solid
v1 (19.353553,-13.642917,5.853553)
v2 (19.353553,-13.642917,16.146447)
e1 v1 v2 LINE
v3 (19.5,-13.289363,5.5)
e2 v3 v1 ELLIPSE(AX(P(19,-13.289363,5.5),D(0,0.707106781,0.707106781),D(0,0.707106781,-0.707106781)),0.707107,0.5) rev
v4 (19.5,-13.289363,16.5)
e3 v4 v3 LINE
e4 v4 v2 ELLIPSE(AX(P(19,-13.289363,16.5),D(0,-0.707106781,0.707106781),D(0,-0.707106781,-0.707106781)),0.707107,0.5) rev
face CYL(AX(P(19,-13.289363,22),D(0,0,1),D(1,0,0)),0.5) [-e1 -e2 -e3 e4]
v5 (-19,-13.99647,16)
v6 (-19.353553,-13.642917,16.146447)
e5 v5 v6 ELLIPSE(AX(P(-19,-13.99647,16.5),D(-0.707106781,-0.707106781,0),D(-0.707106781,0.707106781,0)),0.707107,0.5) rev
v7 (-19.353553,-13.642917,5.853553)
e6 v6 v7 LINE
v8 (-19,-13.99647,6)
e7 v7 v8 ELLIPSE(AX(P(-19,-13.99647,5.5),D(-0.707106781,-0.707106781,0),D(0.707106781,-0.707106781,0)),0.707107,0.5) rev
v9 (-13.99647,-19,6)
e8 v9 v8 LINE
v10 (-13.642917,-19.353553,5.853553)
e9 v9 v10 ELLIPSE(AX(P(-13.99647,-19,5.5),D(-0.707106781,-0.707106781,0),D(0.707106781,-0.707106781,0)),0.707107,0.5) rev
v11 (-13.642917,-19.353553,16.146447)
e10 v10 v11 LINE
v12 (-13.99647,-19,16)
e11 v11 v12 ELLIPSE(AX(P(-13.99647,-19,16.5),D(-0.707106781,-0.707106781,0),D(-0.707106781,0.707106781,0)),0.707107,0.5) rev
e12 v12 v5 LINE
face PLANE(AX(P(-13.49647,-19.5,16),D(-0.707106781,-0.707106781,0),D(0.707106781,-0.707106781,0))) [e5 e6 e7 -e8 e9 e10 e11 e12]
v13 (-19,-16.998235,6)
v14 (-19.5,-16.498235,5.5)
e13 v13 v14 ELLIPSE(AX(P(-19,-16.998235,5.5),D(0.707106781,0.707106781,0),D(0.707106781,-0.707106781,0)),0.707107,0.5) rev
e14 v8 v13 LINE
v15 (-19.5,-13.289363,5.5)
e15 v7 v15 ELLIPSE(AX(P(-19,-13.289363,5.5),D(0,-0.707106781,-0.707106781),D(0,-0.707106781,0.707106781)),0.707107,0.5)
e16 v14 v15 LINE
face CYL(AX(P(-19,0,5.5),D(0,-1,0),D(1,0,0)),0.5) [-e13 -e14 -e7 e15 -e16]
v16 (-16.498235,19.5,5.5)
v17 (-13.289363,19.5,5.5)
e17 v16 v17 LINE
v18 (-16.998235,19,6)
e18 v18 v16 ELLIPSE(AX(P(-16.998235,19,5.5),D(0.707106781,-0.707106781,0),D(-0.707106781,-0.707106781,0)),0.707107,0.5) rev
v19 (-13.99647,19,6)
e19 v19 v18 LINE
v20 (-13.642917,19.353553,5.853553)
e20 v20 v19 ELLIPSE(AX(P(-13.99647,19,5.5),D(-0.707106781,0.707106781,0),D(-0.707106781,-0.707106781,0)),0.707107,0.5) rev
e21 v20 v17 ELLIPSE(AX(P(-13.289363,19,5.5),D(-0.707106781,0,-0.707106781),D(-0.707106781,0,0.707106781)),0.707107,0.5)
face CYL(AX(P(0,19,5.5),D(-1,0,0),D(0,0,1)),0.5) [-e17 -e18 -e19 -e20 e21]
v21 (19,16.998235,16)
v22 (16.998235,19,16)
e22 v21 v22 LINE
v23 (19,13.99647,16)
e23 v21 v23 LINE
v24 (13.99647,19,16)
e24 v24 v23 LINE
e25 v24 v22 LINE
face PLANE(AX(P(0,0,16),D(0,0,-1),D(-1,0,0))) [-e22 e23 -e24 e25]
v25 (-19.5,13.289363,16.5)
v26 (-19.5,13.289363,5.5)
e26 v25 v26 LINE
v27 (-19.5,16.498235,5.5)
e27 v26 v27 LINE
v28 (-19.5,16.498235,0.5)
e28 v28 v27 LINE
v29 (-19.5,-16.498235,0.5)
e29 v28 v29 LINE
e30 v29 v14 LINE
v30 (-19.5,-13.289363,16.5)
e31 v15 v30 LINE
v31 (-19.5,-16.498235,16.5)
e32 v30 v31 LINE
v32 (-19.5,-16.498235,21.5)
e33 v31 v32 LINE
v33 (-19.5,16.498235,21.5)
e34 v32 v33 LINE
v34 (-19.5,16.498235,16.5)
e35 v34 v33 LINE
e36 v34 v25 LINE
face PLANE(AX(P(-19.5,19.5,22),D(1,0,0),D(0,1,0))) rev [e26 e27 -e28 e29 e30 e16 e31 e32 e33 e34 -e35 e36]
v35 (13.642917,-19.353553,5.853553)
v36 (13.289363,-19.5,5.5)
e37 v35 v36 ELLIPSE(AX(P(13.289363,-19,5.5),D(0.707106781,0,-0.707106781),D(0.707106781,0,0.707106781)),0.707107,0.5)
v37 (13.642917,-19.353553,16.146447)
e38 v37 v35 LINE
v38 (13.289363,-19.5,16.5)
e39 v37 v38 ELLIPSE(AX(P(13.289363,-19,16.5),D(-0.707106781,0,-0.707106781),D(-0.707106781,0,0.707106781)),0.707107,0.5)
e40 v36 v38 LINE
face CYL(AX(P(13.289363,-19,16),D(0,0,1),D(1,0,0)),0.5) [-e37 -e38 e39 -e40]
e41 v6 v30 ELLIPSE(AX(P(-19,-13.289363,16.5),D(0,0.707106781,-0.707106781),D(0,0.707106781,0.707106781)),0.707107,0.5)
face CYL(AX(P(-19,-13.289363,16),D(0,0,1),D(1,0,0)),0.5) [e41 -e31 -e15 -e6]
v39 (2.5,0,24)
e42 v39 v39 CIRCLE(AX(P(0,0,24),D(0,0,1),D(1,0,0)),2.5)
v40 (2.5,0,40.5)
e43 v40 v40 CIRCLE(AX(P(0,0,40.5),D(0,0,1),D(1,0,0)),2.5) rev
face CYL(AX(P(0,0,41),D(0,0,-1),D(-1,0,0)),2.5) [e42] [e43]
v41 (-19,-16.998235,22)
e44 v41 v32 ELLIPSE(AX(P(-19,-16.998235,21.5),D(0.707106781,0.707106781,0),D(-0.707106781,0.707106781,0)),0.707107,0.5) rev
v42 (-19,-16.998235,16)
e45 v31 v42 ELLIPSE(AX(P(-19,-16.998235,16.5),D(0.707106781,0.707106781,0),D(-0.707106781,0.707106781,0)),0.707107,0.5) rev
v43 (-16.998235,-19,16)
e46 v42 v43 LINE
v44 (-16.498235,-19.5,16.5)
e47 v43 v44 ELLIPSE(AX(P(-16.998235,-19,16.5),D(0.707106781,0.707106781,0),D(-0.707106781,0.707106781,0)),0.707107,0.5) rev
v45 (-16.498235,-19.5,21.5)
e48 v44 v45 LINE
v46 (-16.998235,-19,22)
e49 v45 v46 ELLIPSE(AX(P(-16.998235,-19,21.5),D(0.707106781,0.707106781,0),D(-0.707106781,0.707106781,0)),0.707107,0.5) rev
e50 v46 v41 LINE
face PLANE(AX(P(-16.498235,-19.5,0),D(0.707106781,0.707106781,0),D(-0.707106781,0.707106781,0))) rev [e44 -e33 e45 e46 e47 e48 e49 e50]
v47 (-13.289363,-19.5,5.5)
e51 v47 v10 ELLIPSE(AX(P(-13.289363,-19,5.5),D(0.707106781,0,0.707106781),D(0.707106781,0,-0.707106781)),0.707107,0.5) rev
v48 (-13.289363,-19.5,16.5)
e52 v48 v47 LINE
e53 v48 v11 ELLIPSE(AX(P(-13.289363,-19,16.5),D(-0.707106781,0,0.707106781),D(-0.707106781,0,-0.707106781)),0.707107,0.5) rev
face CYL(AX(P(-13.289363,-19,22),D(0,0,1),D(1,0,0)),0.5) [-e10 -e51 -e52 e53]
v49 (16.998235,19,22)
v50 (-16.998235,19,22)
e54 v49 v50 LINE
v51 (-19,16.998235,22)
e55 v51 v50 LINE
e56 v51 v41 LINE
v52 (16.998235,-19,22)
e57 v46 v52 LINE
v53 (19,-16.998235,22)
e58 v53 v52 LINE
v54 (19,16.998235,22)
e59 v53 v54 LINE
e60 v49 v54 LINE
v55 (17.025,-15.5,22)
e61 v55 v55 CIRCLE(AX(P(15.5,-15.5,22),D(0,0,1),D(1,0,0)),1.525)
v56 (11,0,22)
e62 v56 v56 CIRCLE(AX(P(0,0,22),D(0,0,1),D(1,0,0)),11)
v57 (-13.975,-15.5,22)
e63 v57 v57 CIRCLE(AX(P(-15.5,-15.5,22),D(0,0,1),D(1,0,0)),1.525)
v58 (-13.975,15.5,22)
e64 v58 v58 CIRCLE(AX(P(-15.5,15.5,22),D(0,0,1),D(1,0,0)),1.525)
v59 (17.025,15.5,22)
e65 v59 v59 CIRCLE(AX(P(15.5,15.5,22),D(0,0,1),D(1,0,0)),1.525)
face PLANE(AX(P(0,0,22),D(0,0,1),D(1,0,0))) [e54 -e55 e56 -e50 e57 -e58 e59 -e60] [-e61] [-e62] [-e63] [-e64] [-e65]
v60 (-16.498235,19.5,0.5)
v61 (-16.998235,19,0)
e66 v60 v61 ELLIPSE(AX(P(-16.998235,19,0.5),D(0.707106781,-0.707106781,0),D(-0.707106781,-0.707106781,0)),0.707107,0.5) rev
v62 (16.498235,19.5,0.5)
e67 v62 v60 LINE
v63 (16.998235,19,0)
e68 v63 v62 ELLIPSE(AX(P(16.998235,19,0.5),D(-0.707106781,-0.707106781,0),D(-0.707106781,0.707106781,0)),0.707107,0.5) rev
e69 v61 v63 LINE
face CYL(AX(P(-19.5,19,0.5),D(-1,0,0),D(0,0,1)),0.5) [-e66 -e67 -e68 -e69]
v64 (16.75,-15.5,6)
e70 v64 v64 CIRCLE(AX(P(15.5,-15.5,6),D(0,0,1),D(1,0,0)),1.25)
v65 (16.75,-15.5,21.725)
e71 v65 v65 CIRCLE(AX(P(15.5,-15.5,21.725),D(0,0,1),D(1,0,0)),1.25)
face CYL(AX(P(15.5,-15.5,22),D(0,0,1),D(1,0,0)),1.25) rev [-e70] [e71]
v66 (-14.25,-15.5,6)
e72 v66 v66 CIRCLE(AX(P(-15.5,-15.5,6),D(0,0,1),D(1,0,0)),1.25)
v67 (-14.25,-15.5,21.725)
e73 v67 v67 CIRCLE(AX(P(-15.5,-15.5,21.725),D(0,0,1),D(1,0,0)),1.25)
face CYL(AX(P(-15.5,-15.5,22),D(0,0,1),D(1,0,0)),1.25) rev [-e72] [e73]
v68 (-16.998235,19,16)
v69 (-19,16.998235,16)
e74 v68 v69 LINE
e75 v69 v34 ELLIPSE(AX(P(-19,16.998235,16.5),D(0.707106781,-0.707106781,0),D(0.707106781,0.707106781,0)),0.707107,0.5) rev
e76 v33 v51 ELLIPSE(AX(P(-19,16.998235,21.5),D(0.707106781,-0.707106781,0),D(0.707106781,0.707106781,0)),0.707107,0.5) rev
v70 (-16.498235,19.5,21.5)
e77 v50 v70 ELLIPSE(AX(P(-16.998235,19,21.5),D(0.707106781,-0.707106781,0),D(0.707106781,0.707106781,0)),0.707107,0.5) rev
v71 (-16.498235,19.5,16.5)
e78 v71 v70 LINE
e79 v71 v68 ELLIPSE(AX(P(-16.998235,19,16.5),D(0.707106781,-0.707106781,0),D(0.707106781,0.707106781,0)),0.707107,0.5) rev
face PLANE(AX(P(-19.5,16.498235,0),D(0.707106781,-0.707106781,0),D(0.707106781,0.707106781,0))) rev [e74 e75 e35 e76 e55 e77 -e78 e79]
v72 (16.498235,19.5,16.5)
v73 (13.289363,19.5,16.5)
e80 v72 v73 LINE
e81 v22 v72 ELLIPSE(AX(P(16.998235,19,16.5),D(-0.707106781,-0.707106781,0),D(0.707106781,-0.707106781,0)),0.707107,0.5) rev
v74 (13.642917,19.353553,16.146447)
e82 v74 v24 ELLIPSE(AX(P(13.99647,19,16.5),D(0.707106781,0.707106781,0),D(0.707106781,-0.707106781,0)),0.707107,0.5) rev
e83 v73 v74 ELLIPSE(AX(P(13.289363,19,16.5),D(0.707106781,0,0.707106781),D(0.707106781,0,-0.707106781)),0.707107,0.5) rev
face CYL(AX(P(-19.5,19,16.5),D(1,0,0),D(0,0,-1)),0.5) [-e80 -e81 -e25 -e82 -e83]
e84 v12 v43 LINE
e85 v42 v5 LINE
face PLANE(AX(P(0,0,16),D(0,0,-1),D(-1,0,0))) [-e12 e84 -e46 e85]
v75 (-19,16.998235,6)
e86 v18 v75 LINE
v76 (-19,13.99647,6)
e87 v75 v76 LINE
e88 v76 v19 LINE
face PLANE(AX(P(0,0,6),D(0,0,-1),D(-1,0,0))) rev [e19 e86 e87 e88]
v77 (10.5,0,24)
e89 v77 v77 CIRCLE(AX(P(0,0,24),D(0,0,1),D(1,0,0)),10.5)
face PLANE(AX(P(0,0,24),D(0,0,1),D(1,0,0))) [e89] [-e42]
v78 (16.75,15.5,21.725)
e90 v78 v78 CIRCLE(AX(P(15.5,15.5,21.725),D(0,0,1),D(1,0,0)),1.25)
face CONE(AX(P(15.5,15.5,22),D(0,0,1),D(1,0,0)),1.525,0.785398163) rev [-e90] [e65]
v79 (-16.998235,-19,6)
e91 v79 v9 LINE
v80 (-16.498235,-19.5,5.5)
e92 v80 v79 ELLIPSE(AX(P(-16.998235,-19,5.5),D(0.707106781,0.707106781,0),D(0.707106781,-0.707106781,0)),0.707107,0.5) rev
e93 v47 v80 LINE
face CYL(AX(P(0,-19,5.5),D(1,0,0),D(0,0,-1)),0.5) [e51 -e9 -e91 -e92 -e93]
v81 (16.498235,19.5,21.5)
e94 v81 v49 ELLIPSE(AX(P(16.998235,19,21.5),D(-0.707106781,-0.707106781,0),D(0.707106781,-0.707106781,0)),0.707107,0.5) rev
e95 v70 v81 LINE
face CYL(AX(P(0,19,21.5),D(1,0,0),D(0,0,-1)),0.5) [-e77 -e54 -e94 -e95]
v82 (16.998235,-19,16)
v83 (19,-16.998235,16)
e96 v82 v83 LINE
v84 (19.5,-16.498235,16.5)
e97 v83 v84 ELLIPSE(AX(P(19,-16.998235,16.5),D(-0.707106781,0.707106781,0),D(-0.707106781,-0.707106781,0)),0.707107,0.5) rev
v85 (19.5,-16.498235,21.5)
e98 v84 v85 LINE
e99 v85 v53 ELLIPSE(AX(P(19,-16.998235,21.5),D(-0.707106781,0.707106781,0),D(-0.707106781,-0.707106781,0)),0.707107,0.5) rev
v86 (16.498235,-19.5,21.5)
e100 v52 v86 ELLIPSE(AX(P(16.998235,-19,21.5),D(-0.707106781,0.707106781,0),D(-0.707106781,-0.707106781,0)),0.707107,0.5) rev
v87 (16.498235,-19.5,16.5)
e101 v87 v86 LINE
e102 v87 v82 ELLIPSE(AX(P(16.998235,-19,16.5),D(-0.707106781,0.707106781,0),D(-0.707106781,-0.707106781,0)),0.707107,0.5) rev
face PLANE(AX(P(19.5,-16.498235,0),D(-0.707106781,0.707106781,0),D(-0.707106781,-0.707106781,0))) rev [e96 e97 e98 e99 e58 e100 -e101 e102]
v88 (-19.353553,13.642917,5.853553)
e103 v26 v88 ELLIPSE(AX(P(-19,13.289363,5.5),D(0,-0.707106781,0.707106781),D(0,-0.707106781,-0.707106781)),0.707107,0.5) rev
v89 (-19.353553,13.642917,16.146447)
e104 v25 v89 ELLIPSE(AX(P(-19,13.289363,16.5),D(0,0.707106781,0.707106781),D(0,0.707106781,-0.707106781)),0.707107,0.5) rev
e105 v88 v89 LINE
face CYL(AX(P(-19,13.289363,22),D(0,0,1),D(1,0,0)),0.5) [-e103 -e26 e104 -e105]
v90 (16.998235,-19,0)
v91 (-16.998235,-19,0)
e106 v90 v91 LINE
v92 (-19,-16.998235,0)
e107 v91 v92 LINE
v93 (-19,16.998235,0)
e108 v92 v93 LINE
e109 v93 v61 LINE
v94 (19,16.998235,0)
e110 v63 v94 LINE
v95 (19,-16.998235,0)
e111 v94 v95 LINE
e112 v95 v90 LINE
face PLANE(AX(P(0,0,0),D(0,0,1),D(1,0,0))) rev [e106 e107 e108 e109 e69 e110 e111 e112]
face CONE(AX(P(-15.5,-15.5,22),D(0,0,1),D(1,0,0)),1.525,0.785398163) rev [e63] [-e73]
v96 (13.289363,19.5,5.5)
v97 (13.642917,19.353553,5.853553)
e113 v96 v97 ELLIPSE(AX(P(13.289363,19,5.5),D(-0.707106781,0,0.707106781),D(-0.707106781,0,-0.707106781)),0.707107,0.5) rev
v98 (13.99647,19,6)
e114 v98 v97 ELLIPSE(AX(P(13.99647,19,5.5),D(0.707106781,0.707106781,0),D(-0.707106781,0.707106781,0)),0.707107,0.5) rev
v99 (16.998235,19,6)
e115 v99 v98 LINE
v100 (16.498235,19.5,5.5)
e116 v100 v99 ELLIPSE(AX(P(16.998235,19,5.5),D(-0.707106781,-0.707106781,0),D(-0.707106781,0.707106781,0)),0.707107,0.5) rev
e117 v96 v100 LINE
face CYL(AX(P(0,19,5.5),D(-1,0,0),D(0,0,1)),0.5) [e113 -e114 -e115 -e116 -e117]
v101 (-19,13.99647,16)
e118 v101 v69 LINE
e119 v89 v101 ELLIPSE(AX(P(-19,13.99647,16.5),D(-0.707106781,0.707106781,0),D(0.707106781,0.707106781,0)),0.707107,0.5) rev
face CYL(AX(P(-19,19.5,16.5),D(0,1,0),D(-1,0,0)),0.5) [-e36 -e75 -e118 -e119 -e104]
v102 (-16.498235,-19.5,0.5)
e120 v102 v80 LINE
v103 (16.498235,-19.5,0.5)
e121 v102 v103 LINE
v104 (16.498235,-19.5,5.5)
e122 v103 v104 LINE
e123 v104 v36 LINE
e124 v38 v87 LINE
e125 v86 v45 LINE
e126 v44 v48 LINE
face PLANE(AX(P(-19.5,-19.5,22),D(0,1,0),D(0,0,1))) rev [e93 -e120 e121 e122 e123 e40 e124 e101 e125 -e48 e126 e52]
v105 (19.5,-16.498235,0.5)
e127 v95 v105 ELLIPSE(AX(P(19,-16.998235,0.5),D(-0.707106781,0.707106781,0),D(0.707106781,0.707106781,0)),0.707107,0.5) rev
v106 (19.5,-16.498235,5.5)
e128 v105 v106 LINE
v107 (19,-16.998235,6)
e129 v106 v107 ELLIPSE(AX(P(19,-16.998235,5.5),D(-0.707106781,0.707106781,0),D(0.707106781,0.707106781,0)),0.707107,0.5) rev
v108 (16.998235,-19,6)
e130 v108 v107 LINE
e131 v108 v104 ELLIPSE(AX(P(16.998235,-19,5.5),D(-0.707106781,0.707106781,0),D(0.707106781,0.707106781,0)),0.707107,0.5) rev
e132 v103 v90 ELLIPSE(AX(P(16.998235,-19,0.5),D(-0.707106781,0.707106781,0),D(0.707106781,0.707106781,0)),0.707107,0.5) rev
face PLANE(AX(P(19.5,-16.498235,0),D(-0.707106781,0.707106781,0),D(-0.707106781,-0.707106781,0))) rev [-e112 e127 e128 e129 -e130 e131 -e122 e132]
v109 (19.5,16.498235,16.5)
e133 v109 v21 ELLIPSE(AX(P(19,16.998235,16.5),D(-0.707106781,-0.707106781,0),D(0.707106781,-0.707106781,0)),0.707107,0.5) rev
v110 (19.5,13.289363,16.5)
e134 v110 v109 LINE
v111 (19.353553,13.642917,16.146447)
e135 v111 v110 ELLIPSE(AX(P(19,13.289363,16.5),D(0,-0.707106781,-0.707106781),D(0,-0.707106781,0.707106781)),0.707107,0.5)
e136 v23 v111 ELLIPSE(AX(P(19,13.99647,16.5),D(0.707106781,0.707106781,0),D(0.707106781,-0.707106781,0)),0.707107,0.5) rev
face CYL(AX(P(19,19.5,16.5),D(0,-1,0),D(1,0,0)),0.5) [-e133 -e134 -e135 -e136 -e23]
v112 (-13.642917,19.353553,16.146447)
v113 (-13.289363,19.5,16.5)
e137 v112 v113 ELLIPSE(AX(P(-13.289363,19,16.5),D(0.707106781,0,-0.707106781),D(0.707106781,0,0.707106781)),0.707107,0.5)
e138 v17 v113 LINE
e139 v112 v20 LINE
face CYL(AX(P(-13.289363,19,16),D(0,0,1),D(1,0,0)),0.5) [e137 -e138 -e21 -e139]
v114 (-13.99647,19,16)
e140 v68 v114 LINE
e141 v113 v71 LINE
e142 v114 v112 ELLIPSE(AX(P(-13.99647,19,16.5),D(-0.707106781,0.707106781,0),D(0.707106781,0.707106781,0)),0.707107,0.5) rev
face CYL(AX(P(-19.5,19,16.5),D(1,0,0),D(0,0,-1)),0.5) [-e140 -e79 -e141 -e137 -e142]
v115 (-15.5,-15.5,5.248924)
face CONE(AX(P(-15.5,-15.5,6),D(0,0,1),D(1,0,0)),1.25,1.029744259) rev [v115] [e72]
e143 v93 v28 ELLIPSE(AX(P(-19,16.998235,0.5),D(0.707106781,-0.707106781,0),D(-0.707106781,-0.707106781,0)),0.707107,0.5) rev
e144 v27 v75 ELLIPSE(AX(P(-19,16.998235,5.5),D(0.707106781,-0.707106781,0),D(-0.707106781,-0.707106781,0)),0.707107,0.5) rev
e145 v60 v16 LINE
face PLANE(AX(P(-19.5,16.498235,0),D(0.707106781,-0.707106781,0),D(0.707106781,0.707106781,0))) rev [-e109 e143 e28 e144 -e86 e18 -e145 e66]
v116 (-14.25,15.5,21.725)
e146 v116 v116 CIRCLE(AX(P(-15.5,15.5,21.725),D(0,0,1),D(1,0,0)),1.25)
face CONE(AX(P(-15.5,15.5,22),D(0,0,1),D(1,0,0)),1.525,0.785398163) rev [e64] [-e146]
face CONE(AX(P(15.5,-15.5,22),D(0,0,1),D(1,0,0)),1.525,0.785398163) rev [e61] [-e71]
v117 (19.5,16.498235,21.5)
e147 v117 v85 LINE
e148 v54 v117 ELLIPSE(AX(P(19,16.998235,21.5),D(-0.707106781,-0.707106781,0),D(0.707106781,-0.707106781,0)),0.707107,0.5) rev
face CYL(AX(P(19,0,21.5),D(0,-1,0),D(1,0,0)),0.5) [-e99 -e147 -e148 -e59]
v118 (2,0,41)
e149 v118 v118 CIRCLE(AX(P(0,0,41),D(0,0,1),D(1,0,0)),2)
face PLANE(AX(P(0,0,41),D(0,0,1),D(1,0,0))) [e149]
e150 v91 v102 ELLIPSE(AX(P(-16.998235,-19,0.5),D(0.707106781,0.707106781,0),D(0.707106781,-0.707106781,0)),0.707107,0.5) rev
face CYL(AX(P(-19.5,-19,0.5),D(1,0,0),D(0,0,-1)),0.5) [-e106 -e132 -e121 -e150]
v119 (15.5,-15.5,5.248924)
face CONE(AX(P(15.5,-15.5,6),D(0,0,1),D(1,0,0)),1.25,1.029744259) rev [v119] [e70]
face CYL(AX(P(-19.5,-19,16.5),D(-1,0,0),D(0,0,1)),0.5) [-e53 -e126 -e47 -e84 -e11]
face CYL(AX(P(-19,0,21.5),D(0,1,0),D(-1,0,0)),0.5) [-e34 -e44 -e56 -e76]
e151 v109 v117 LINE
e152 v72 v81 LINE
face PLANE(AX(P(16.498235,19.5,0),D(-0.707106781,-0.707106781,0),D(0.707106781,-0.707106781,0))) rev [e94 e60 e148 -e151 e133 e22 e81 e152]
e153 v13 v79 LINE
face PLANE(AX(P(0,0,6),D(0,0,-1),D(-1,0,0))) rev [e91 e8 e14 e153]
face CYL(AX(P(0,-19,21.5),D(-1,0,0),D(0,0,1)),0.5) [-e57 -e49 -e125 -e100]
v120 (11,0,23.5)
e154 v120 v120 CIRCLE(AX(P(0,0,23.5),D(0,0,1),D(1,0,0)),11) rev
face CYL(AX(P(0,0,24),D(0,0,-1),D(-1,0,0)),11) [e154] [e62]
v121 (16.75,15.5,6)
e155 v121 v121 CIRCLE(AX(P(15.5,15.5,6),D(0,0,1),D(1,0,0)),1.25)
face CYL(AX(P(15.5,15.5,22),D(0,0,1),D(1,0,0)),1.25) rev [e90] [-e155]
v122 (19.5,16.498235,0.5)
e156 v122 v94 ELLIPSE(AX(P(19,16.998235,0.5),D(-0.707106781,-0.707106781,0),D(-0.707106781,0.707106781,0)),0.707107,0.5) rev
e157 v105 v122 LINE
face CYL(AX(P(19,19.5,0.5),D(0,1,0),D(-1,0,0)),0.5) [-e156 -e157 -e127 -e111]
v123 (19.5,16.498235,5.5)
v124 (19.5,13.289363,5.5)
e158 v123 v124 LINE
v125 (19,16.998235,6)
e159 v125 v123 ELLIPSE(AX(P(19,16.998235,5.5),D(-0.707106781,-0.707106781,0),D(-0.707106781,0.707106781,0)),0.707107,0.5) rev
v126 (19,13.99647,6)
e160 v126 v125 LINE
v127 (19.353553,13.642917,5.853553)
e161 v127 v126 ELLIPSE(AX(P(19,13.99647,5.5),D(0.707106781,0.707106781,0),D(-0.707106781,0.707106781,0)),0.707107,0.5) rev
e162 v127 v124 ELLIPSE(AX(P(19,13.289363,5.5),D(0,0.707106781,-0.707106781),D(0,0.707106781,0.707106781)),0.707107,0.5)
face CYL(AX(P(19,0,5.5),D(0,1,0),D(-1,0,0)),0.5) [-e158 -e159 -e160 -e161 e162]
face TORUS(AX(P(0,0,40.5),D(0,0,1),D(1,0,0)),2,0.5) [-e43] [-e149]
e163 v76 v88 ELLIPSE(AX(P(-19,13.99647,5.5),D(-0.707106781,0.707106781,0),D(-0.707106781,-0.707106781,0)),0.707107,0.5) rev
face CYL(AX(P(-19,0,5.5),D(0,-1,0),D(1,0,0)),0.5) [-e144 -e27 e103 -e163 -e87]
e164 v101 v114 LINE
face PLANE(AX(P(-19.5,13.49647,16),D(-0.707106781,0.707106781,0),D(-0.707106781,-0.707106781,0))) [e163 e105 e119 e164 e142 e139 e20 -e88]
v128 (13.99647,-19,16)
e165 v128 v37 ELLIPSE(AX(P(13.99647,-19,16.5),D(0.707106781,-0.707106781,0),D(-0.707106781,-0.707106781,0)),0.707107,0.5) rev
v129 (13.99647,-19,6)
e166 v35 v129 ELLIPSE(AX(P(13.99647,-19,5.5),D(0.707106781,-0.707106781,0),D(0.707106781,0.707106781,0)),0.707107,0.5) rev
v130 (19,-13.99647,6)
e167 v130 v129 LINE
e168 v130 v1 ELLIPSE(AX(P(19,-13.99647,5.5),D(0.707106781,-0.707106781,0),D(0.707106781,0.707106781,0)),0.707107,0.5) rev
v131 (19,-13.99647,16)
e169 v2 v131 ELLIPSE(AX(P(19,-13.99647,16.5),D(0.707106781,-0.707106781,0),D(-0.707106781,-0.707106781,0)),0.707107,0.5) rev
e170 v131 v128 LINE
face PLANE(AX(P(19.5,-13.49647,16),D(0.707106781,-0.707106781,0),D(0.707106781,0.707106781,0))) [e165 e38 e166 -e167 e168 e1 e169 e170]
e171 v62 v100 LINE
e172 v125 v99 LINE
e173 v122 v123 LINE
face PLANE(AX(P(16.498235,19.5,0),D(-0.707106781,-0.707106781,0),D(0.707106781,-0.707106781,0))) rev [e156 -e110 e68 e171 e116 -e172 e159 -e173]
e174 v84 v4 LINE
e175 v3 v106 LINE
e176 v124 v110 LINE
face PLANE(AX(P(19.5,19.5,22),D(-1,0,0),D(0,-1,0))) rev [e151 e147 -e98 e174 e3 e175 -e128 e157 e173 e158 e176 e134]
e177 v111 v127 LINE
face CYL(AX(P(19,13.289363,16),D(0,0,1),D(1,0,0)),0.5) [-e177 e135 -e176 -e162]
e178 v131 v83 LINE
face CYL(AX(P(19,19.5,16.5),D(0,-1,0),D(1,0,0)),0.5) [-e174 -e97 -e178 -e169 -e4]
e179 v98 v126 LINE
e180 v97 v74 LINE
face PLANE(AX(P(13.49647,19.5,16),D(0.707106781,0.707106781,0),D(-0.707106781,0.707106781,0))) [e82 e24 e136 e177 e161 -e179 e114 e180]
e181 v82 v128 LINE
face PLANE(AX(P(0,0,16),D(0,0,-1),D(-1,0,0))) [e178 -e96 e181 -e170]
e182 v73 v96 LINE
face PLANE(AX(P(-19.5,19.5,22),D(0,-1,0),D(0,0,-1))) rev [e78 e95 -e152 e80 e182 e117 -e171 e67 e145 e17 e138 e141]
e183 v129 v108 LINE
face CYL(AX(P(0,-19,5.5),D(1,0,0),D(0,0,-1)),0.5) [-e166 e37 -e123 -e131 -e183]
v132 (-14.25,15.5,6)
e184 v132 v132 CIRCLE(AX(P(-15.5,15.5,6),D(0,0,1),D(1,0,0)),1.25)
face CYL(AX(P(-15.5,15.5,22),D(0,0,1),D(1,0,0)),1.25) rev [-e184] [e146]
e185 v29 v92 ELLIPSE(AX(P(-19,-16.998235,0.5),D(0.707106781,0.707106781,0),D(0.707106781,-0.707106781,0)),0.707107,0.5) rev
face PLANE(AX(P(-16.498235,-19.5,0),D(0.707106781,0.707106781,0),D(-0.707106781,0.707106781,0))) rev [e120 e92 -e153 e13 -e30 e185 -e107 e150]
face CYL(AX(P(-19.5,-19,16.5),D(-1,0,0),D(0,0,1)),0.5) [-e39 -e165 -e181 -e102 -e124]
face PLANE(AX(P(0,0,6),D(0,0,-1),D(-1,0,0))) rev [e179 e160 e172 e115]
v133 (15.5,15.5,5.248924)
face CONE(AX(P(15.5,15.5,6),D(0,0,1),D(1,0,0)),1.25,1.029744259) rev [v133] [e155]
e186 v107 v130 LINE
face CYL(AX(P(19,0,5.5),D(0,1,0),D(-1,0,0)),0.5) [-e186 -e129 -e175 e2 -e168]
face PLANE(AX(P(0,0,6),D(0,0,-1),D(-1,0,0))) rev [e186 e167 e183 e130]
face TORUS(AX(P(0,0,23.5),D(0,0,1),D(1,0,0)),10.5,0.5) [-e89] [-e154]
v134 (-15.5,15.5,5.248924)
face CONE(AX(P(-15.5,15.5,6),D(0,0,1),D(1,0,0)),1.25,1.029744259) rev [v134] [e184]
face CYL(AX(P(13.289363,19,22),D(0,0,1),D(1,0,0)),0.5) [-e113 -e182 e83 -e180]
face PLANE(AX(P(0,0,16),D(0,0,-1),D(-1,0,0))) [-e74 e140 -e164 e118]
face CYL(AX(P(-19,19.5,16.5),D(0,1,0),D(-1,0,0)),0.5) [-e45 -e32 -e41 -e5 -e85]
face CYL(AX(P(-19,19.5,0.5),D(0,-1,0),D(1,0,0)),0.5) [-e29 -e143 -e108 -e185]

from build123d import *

# Parameters (mm, degrees)
SKETCH_1_W               = 39
SKETCH_1_H               = 39
EXTRUDE_1_DEPTH          = 22
SKETCH_2_R               = 11
EXTRUDE_2_DEPTH          = 2
SKETCH_3_R               = 2.5
EXTRUDE_3_DEPTH          = 17
CUT_EXTRUDE_1_DEPTH      = 5
CUT_EXTRUDE_1_DEPTH_BACK = 5
FILLET_1_R               = 0.5
CUT_EXTRUDE_2_DEPTH      = 36.277471565


# Read off the part's stored shape, not the designer's step: M3 螺纹孔1
with BuildPart() as part:
    # 草图1 → 凸台-拉伸1 (new body)
    with BuildSketch(Plane.XY):
        Rectangle(SKETCH_1_W, SKETCH_1_H)
    extrude(amount=EXTRUDE_1_DEPTH)

    # 草图2 → 凸台-拉伸2 (add)
    with BuildSketch(Plane.XY.offset(22)):
        Circle(SKETCH_2_R)
    extrude(amount=EXTRUDE_2_DEPTH)

    # 草图3 → 凸台-拉伸3 (add)
    with BuildSketch(Plane.XY.offset(24)):
        Circle(SKETCH_3_R)
    extrude(amount=EXTRUDE_3_DEPTH)

    # 草图5 → 切除-拉伸1 (cut, two sides: drawn at the far end of the back side and taken through both)
    with BuildSketch(Plane.XY.offset(11).offset(-CUT_EXTRUDE_1_DEPTH_BACK)):
        Polygon((13.496470179, 19.5), (19.5, 13.496470179), (19.5, 19.5), align=None)
        Polygon((19.5, -19.5), (13.49647018, -19.5), (19.5, -13.496470179), align=None)
        Polygon((-13.496470179, -19.5), (-19.5, -13.49647018), (-19.5, -19.5), align=None)
        Polygon((-19.5, 13.496470179), (-19.5, 19.5), (-13.496470179, 19.5), align=None)
    extrude(amount=CUT_EXTRUDE_1_DEPTH + CUT_EXTRUDE_1_DEPTH_BACK, mode=Mode.SUBTRACT)

    # 圆角1
    fillet_1_edges = [part.edges().sort_by_distance(p)[0] for p in [
        (-19.5, 0, 22),
        (-11, 0, 24),
        (0, -19.5, 22),
        (-2.5, 0, 41),
        (19.5, -19.5, 3),
        (-19.5, -19.5, 3),
        (-19.5, 19.5, 3),
        (19.5, 19.5, 3),
        (-19.5, 13.496470179, 11),
        (-13.496470179, 19.5, 11),
        (-16.49823509, 19.5, 6),
        (-19.5, 16.49823509, 6),
        (-16.49823509, 19.5, 16),
        (-19.5, 16.49823509, 16),
        (-16.49823509, -19.5, 6),
        (-13.496470179, -19.5, 11),
        (-19.5, -13.49647018, 11),
        (-19.5, -16.49823509, 6),
        (-16.49823509, -19.5, 16),
        (-19.5, -16.49823509, 16),
        (19.5, -16.49823509, 6),
        (19.5, -13.496470179, 11),
        (13.49647018, -19.5, 11),
        (16.49823509, -19.5, 6),
        (19.5, -16.49823509, 16),
        (16.49823509, -19.5, 16),
        (19.5, 0, 22),
        (0, -19.5, 0),
        (16.49823509, 19.5, 6),
        (13.496470179, 19.5, 11),
        (19.5, 13.496470179, 11),
        (19.5, 16.49823509, 6),
        (16.49823509, 19.5, 16),
        (19.5, 16.49823509, 16),
        (-19.5, 0, 0),
        (0, 19.5, 0),
        (19.5, 0, 0),
        (19.5, -19.5, 19),
        (-19.5, -19.5, 19),
        (-19.5, 19.5, 19),
        (19.5, 19.5, 19),
        (0, 19.5, 22),
    ]]
    fillet(fillet_1_edges, radius=FILLET_1_R)

    # 草图6 → 切除-拉伸2 (cut, through all)
    with BuildSketch(Plane.XY.offset(22)):
        Polygon((19.5, 19.5), (16.49823509, 19.5), (19.5, 16.49823509), align=None)
        Polygon((19.5, -19.5), (19.5, -16.49823509), (16.49823509, -19.5), align=None)
        Polygon((-19.5, -19.5), (-16.49823509, -19.5), (-19.5, -16.49823509), align=None)
        Polygon((-19.5, 19.5), (-19.5, 16.49823509), (-16.49823509, 19.5), align=None)
    extrude(amount=-CUT_EXTRUDE_2_DEPTH, mode=Mode.SUBTRACT)

    # M3 螺纹孔1 outline → M3 螺纹孔1 (revolve, cut)
    with BuildSketch(Plane(origin=(-15.5, 15.5, 0), x_dir=(1, 0, 0), z_dir=(0, -1, 0))):
        Polygon((0, 22), (0, 5.248924226), (1.25, 6), (1.25, 21.725), (1.525, 22), align=None)
    hole_wizard_m3_1 = revolve(axis=Axis((-15.5, 15.5, 0), (0, 0, 1)), mode=Mode.SUBTRACT)

    # Hole Wizard M3 _1 2 outline → Hole Wizard M3 _1 2 (revolve, cut)
    with BuildSketch(Plane(origin=(15.5, 15.5, 0), x_dir=(1, 0, 0), z_dir=(0, -1, 0))):
        Polygon((0, 22), (0, 5.248924226), (1.25, 6), (1.25, 21.725), (1.525, 22), align=None)
    hole_wizard_m3_1_2 = revolve(axis=Axis((15.5, 15.5, 0), (0, 0, 1)), mode=Mode.SUBTRACT)

    # 镜向1: M3 螺纹孔1, Hole Wizard M3 _1 2 across plane
    add(hole_wizard_m3_1.mirror(Plane.ZX), mode=Mode.SUBTRACT)
    add(hole_wizard_m3_1_2.mirror(Plane.ZX), mode=Mode.SUBTRACT)


solid = part.part
